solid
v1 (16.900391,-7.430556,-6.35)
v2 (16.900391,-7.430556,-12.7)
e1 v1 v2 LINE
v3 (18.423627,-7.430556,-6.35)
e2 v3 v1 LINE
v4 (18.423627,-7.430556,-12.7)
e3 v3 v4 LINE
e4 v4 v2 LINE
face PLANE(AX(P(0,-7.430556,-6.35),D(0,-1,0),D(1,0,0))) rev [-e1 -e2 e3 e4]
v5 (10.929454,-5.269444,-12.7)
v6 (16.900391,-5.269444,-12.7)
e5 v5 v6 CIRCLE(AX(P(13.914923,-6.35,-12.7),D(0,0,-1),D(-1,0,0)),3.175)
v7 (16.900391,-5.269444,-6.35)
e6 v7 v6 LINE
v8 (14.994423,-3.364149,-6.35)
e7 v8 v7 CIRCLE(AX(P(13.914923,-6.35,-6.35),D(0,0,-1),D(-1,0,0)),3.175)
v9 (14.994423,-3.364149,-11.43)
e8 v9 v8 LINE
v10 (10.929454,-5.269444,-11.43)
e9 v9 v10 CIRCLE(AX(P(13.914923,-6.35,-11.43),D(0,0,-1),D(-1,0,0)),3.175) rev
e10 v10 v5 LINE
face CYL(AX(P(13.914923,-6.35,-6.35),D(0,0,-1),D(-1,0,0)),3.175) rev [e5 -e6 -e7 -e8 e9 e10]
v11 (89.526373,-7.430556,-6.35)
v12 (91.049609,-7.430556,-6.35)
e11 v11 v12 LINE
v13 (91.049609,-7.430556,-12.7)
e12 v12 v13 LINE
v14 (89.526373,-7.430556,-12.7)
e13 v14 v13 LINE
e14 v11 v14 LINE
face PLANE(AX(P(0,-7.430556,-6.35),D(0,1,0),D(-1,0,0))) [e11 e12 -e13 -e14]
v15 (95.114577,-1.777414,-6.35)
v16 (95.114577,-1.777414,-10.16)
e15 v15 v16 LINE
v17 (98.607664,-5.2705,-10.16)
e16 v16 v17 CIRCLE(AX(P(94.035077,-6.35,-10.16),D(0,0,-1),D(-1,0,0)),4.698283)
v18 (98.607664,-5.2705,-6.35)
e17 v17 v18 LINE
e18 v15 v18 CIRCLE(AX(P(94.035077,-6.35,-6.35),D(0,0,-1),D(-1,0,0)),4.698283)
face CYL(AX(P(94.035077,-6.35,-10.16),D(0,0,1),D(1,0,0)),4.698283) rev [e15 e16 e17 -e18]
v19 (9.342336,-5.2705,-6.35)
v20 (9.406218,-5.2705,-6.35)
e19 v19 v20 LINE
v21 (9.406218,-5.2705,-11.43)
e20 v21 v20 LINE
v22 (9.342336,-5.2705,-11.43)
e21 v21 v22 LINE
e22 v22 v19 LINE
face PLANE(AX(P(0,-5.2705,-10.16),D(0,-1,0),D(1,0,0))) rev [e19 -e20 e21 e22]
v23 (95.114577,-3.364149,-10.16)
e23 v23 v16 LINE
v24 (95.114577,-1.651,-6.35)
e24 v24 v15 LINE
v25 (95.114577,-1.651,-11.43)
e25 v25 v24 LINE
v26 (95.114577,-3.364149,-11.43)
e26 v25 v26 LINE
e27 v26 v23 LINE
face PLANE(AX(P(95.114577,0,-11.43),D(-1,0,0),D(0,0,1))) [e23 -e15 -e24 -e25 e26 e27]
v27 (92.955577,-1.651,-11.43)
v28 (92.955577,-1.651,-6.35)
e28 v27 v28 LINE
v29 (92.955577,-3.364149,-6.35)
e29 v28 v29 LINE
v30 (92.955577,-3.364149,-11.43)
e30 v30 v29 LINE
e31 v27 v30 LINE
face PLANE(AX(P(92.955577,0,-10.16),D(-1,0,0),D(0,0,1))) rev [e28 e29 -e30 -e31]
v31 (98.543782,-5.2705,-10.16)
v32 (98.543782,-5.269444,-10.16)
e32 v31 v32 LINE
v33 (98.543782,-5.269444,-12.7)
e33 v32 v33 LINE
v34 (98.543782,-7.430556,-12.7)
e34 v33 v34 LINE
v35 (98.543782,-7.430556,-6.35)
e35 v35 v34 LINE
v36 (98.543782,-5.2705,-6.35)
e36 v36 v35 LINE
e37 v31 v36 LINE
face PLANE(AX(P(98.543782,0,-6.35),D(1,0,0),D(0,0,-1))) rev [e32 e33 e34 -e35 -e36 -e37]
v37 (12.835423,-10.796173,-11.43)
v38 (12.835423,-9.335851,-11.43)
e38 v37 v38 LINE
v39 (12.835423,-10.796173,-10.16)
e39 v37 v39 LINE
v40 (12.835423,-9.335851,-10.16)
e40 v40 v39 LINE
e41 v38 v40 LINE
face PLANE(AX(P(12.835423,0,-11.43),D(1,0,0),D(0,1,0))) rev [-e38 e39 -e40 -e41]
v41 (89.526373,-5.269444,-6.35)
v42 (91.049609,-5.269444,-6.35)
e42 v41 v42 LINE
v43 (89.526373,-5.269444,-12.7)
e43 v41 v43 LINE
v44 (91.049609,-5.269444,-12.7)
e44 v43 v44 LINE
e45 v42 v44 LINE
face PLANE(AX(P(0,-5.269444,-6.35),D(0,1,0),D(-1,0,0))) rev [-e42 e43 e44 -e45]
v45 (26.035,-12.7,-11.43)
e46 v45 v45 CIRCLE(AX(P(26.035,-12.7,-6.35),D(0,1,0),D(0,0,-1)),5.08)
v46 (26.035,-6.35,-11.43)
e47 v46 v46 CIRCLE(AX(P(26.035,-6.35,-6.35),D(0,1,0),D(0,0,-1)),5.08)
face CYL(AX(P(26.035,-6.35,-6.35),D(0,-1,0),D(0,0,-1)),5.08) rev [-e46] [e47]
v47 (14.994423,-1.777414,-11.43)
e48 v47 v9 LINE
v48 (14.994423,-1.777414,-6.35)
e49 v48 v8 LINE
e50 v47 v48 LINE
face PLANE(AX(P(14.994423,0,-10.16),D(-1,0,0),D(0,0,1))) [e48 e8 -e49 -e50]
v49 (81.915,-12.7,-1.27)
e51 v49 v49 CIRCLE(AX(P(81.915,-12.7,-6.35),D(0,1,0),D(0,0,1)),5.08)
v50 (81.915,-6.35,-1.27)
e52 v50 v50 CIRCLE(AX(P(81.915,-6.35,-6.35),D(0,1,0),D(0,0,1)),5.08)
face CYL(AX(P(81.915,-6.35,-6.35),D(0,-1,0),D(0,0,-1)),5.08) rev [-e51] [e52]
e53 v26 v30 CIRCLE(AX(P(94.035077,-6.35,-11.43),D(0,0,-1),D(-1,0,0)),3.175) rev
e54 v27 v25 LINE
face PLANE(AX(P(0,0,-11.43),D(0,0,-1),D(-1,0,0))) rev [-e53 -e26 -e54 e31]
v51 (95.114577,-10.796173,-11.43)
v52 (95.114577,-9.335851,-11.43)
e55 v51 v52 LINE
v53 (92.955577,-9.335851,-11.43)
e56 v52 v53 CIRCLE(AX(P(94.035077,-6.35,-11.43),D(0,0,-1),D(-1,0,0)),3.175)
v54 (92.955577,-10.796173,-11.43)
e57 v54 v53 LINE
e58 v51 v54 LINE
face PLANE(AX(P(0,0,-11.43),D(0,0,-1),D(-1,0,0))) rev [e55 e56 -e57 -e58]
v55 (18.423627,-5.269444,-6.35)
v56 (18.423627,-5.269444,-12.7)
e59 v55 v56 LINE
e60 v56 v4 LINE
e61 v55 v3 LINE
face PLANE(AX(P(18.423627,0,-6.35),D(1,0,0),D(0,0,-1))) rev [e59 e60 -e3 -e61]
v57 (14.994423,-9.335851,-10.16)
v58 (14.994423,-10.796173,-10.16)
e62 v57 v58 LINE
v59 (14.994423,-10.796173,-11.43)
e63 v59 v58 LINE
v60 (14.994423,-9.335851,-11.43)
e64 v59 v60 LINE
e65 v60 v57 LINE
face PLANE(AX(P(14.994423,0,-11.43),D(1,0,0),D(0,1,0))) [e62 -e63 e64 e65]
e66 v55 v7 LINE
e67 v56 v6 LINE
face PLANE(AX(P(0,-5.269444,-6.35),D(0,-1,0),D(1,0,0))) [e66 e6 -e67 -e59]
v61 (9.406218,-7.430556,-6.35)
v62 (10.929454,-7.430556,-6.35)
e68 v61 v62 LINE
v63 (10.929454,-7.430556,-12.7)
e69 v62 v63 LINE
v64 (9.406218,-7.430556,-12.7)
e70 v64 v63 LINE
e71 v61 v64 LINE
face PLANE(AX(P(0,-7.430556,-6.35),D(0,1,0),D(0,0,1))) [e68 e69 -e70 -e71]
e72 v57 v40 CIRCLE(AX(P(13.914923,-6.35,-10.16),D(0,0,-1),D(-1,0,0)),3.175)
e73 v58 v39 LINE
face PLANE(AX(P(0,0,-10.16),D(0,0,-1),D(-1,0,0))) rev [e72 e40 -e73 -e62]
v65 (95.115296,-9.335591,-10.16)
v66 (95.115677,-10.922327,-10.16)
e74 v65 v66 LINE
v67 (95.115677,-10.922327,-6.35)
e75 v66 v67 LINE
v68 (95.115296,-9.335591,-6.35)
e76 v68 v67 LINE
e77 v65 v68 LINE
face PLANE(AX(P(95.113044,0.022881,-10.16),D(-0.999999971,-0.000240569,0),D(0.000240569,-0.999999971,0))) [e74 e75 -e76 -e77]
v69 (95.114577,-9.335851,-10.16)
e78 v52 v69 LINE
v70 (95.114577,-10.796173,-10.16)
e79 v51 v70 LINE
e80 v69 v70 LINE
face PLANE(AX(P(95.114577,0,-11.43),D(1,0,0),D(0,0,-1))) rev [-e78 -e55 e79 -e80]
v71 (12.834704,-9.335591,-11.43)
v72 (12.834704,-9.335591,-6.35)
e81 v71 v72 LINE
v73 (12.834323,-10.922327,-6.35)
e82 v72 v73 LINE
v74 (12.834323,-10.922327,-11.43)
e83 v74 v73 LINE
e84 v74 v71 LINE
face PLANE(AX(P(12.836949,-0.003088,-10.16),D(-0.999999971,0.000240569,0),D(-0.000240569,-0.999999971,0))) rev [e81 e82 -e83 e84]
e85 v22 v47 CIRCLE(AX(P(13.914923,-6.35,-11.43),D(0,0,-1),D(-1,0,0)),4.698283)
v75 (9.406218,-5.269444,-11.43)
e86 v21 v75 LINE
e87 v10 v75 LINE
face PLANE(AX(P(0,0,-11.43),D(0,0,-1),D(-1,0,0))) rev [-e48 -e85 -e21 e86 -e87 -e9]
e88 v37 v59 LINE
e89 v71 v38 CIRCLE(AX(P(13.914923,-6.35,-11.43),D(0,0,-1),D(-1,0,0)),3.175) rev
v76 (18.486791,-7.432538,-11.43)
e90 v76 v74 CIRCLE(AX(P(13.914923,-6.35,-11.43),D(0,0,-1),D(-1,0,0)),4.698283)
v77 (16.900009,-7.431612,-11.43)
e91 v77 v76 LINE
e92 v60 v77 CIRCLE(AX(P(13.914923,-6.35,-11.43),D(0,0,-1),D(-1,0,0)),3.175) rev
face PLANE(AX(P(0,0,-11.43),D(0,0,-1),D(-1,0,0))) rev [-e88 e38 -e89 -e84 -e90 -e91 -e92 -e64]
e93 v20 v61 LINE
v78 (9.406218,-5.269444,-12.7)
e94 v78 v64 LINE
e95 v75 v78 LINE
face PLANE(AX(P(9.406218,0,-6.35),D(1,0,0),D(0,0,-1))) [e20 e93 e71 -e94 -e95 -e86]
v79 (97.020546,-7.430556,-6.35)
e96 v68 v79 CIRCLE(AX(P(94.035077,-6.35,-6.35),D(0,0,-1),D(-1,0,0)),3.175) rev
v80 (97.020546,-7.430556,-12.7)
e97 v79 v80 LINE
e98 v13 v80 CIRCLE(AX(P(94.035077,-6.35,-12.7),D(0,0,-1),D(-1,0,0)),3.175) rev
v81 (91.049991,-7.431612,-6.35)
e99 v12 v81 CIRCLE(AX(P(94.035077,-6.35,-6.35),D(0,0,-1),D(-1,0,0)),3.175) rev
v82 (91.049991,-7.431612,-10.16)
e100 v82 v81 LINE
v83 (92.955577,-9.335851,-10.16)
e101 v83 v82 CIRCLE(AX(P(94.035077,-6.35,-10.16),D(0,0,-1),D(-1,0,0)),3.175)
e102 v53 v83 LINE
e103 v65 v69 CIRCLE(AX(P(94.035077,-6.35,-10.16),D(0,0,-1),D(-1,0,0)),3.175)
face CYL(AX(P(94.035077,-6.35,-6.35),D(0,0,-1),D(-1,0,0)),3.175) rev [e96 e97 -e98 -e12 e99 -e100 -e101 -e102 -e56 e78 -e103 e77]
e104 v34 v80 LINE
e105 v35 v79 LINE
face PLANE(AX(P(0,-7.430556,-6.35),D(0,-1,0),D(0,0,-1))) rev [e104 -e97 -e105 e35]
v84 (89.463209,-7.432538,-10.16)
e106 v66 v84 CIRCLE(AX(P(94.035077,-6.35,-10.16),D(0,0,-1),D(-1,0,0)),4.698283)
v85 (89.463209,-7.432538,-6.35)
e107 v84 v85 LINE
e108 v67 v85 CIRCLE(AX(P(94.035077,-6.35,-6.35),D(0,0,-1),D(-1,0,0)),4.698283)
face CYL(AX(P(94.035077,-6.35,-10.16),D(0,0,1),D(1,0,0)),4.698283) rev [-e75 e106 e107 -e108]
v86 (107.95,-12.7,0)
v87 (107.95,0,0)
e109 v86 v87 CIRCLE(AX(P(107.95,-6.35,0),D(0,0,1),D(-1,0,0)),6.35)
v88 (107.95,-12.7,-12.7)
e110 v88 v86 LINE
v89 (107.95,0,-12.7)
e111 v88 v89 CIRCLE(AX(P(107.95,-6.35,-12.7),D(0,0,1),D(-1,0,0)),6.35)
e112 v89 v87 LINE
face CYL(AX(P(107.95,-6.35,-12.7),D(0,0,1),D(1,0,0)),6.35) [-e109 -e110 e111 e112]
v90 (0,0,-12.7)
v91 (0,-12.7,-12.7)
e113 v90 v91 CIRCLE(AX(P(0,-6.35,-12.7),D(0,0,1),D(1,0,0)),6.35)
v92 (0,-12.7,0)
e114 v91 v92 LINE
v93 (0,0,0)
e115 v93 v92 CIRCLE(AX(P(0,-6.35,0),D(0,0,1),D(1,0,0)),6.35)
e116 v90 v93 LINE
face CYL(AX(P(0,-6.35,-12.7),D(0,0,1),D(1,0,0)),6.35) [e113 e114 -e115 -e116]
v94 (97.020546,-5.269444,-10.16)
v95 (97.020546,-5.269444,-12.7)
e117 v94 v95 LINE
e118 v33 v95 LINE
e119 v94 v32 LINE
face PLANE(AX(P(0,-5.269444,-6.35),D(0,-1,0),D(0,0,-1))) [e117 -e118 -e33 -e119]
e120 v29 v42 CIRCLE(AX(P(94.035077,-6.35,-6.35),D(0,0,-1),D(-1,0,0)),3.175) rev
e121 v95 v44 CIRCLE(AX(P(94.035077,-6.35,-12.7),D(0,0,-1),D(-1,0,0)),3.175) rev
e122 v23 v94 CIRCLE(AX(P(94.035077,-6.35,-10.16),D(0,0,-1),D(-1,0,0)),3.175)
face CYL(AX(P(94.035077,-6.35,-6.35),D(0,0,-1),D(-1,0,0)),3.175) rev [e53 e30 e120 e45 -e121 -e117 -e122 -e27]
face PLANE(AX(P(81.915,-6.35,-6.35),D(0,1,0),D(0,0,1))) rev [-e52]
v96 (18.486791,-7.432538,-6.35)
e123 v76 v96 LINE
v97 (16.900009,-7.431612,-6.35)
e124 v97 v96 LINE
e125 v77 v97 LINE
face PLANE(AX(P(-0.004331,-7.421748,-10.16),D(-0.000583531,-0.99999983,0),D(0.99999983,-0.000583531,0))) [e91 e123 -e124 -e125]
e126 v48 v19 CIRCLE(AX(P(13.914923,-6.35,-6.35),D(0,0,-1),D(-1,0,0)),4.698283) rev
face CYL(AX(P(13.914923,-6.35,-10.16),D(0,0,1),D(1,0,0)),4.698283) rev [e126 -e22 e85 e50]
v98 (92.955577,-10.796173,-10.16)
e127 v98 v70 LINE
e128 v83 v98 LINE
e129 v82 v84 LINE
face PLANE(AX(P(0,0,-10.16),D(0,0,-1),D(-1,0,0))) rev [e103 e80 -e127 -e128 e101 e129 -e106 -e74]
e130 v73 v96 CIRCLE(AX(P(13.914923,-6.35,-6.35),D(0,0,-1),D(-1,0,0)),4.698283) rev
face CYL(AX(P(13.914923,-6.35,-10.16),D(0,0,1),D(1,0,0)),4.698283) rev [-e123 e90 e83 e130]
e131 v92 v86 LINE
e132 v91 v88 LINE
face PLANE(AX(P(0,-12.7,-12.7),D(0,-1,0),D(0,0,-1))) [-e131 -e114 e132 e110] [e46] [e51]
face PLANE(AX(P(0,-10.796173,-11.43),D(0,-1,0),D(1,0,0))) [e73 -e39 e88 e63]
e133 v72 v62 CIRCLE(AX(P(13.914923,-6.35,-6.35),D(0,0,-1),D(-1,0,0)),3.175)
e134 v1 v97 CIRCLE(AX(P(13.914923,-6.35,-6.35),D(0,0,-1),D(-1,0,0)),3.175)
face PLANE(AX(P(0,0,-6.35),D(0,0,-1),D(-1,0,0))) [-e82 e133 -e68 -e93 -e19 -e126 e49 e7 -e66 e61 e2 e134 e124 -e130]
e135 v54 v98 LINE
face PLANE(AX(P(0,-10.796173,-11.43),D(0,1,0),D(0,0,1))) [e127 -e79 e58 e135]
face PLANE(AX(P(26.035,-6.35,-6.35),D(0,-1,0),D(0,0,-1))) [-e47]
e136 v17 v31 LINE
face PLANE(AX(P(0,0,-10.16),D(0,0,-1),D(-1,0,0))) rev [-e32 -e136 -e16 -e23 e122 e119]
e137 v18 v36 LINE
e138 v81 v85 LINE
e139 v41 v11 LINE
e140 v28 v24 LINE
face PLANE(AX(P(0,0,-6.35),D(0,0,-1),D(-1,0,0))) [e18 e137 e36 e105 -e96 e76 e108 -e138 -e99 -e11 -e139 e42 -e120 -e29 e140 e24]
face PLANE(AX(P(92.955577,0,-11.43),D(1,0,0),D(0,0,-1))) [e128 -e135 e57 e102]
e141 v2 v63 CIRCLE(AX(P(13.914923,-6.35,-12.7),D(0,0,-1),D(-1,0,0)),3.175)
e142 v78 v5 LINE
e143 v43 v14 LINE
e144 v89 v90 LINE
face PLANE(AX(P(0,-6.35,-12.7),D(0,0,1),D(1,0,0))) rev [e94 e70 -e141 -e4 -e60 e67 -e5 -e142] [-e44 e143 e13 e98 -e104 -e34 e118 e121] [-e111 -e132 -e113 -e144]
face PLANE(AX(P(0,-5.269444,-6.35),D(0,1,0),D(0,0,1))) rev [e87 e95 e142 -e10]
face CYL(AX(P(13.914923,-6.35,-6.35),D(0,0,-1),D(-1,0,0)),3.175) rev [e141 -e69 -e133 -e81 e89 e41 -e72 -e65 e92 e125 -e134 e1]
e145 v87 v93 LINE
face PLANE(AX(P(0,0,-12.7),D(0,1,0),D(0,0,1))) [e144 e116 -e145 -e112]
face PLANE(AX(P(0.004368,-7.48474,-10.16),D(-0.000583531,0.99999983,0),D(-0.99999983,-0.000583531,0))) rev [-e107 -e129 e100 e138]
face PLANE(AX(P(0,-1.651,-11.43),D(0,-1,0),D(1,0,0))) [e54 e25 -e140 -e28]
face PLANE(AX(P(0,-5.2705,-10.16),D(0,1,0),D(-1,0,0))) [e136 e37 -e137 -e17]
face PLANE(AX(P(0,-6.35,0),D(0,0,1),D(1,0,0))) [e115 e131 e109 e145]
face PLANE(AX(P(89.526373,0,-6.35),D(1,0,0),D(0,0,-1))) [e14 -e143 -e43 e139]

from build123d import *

# Parameters (mm, degrees)
BOSS_EXTRUDE1_DEPTH = 12.7
CUT_EXTRUDE1_DEPTH  = 6.35
CUT_EXTRUDE4_START  = 3.81
CUT_EXTRUDE4_DEPTH  = 3.81
CUT_EXTRUDE5_DEPTH  = 5.08
SKETCH5_R           = 5.08
CUT_EXTRUDE6_DEPTH  = 6.35


# Read off the part's stored shape, not the designer's step: Cut-Extrude5
with BuildPart() as part:
    # Sketch1 → Boss-Extrude1 (new body)
    with BuildSketch(Plane.XY):
        with BuildLine():
            Line((0, 0), (107.95, 0))
            ThreePointArc((107.95, 0), (114.3, -6.35), (107.95, -12.7))
            Line((107.95, -12.7), (0, -12.7))
            ThreePointArc((0, -12.7), (-6.35, -6.35), (0, 0))
        make_face()
    extrude(amount=-BOSS_EXTRUDE1_DEPTH)

    # Sketch2 → Cut-Extrude1 (cut)
    with BuildSketch(Plane(origin=(0, 0, -12.7), x_dir=(-1, 0, 0), z_dir=(0, 0, -1))):
        with BuildLine():
            Line((-98.543781691, -5.269443984), (-97.020546117, -5.269443984))
            ThreePointArc((-97.020546117, -5.269443984), (-94.03507736, -3.175), (-91.049608603, -5.269443984))
            Line((-91.049608603, -5.269443984), (-89.526373029, -5.269443984))
            Line((-89.526373029, -5.269443984), (-89.526373029, -7.430556016))
            Line((-89.526373029, -7.430556016), (-91.049608603, -7.430556016))
            ThreePointArc((-91.049608603, -7.430556016), (-94.03507736, -9.525), (-97.020546117, -7.430556016))
            Line((-97.020546117, -7.430556016), (-98.543781691, -7.430556016))
            Line((-98.543781691, -7.430556016), (-98.543781691, -5.269443984))
        make_face()
        with BuildLine():
            Line((-18.423626971, -5.269443984), (-18.423626971, -7.430556016))
            Line((-18.423626971, -7.430556016), (-16.900391397, -7.430556016))
            ThreePointArc((-16.900391397, -7.430556016), (-13.91492264, -9.525), (-10.929453883, -7.430556016))
            Line((-10.929453883, -7.430556016), (-9.406218309, -7.430556016))
            Line((-9.406218309, -7.430556016), (-9.406218309, -5.269443984))
            Line((-9.406218309, -5.269443984), (-10.929453883, -5.269443984))
            ThreePointArc((-10.929453883, -5.269443984), (-13.91492264, -3.175), (-16.900391397, -5.269443984))
            Line((-16.900391397, -5.269443984), (-18.423626971, -5.269443984))
        make_face()
    extrude(amount=-CUT_EXTRUDE1_DEPTH, mode=Mode.SUBTRACT)

    # Sketch3 → Cut-Extrude4 (cut)
    with BuildSketch(Plane(origin=(0, 0, -6.35), x_dir=(-1, 0, 0), z_dir=(0, 0, -1)).offset(CUT_EXTRUDE4_START)):
        with BuildLine():
            ThreePointArc((-14.99442264, -1.777413667), (-11.444937607, -2.353371426), (-9.342336307, -5.2705))
            Line((-9.342336307, -5.2705), (-10.929071882, -5.2705))
            ThreePointArc((-10.929071882, -5.2705), (-12.566929092, -3.475362911), (-14.99442264, -3.364149242))
            Line((-14.99442264, -3.364149242), (-14.99442264, -1.777413667))
        make_face()
        with BuildLine():
            ThreePointArc((-12.834322649, -10.922326506), (-16.383098929, -10.347745843), (-18.486790701, -7.432537968))
            Line((-18.486790701, -7.432537968), (-16.900008973, -7.431612032))
            ThreePointArc((-16.900008973, -7.431612032), (-15.26155345, -9.225275719), (-12.834704368, -9.335590978))
            Line((-12.834704368, -9.335590978), (-12.834322649, -10.922326506))
        make_face()
        with BuildLine():
            ThreePointArc((-95.115295632, -9.335590978), (-92.68844655, -9.225275719), (-91.049991027, -7.431612032))
            Line((-91.049991027, -7.431612032), (-89.463209299, -7.432537968))
            ThreePointArc((-89.463209299, -7.432537968), (-91.566901071, -10.347745843), (-95.115677351, -10.922326506))
            Line((-95.115677351, -10.922326506), (-95.115295632, -9.335590978))
        make_face()
        with BuildLine():
            ThreePointArc((-92.95557736, -3.364149242), (-95.383070908, -3.475362911), (-97.020928118, -5.2705))
            Line((-97.020928118, -5.2705), (-98.607663693, -5.2705))
            ThreePointArc((-98.607663693, -5.2705), (-96.505062393, -2.353371426), (-92.95557736, -1.777413667))
            Line((-92.95557736, -1.777413667), (-92.95557736, -3.364149242))
        make_face()
    extrude(amount=-CUT_EXTRUDE4_DEPTH, mode=Mode.SUBTRACT)

    # Cut-Extrude5 outline → Cut-Extrude5 (cut)
    with BuildSketch(Plane(origin=(0, 0, -6.35), x_dir=(-1, 0, 0), z_dir=(0, 0, -1))):
        with BuildLine():
            ThreePointArc((-9.342336307, -5.2705), (-11.444937607, -2.353371426), (-14.99442264, -1.777413667))
            Line((-14.99442264, -1.777413667), (-14.99442264, -3.364149242))
            ThreePointArc((-14.99442264, -3.364149242), (-12.567437486, -3.475124566), (-10.929453883, -5.269443984))
            Line((-10.929453883, -5.269443984), (-9.406218309, -5.269443984))
            Line((-9.406218309, -5.269443984), (-9.406218309, -5.2705))
            Line((-9.406218309, -5.2705), (-9.342336307, -5.2705))
        make_face()
        with BuildLine():
            ThreePointArc((-18.486790701, -7.432537968), (-16.383098929, -10.347745843), (-12.834322649, -10.922326506))
            Line((-12.834322649, -10.922326506), (-12.834704368, -9.335590978))
            ThreePointArc((-12.834704368, -9.335590978), (-12.835063496, -9.335720889), (-12.83542264, -9.335850758))
            Line((-12.83542264, -9.335850758), (-12.83542264, -10.796172665))
            Line((-12.83542264, -10.796172665), (-14.99442264, -10.796172665))
            Line((-14.99442264, -10.796172665), (-14.99442264, -9.335850758))
            ThreePointArc((-14.99442264, -9.335850758), (-16.159192409, -8.595858011), (-16.900008973, -7.431612032))
            Line((-16.900008973, -7.431612032), (-18.486790701, -7.432537968))
        make_face()
        with BuildLine():
            ThreePointArc((-95.11457736, -3.364149242), (-94.03507736, -3.175), (-92.95557736, -3.364149242))
            Line((-92.95557736, -3.364149242), (-92.95557736, -1.651))
            Line((-92.95557736, -1.651), (-95.11457736, -1.651))
            Line((-95.11457736, -1.651), (-95.11457736, -3.364149242))
        make_face()
        with BuildLine():
            Line((-92.95557736, -10.796172665), (-92.95557736, -9.335850758))
            ThreePointArc((-92.95557736, -9.335850758), (-94.03507736, -9.525), (-95.11457736, -9.335850758))
            Line((-95.11457736, -9.335850758), (-95.11457736, -10.796172665))
            Line((-95.11457736, -10.796172665), (-92.95557736, -10.796172665))
        make_face()
    extrude(amount=CUT_EXTRUDE5_DEPTH, mode=Mode.SUBTRACT)

    # Sketch5 → Cut-Extrude6 (cut)
    with BuildSketch(Plane(origin=(0, -12.7, 0), x_dir=(1, 0, 0), z_dir=(0, 1, 0))):
        with Locations(Location((81.915, 6.35, 0), (0, 0, 270))):
            Circle(SKETCH5_R)
        with Locations(Location((26.035, 6.35, 0), (0, 0, 90))):
            Circle(SKETCH5_R)
    extrude(amount=CUT_EXTRUDE6_DEPTH, mode=Mode.SUBTRACT)


solid = part.part
